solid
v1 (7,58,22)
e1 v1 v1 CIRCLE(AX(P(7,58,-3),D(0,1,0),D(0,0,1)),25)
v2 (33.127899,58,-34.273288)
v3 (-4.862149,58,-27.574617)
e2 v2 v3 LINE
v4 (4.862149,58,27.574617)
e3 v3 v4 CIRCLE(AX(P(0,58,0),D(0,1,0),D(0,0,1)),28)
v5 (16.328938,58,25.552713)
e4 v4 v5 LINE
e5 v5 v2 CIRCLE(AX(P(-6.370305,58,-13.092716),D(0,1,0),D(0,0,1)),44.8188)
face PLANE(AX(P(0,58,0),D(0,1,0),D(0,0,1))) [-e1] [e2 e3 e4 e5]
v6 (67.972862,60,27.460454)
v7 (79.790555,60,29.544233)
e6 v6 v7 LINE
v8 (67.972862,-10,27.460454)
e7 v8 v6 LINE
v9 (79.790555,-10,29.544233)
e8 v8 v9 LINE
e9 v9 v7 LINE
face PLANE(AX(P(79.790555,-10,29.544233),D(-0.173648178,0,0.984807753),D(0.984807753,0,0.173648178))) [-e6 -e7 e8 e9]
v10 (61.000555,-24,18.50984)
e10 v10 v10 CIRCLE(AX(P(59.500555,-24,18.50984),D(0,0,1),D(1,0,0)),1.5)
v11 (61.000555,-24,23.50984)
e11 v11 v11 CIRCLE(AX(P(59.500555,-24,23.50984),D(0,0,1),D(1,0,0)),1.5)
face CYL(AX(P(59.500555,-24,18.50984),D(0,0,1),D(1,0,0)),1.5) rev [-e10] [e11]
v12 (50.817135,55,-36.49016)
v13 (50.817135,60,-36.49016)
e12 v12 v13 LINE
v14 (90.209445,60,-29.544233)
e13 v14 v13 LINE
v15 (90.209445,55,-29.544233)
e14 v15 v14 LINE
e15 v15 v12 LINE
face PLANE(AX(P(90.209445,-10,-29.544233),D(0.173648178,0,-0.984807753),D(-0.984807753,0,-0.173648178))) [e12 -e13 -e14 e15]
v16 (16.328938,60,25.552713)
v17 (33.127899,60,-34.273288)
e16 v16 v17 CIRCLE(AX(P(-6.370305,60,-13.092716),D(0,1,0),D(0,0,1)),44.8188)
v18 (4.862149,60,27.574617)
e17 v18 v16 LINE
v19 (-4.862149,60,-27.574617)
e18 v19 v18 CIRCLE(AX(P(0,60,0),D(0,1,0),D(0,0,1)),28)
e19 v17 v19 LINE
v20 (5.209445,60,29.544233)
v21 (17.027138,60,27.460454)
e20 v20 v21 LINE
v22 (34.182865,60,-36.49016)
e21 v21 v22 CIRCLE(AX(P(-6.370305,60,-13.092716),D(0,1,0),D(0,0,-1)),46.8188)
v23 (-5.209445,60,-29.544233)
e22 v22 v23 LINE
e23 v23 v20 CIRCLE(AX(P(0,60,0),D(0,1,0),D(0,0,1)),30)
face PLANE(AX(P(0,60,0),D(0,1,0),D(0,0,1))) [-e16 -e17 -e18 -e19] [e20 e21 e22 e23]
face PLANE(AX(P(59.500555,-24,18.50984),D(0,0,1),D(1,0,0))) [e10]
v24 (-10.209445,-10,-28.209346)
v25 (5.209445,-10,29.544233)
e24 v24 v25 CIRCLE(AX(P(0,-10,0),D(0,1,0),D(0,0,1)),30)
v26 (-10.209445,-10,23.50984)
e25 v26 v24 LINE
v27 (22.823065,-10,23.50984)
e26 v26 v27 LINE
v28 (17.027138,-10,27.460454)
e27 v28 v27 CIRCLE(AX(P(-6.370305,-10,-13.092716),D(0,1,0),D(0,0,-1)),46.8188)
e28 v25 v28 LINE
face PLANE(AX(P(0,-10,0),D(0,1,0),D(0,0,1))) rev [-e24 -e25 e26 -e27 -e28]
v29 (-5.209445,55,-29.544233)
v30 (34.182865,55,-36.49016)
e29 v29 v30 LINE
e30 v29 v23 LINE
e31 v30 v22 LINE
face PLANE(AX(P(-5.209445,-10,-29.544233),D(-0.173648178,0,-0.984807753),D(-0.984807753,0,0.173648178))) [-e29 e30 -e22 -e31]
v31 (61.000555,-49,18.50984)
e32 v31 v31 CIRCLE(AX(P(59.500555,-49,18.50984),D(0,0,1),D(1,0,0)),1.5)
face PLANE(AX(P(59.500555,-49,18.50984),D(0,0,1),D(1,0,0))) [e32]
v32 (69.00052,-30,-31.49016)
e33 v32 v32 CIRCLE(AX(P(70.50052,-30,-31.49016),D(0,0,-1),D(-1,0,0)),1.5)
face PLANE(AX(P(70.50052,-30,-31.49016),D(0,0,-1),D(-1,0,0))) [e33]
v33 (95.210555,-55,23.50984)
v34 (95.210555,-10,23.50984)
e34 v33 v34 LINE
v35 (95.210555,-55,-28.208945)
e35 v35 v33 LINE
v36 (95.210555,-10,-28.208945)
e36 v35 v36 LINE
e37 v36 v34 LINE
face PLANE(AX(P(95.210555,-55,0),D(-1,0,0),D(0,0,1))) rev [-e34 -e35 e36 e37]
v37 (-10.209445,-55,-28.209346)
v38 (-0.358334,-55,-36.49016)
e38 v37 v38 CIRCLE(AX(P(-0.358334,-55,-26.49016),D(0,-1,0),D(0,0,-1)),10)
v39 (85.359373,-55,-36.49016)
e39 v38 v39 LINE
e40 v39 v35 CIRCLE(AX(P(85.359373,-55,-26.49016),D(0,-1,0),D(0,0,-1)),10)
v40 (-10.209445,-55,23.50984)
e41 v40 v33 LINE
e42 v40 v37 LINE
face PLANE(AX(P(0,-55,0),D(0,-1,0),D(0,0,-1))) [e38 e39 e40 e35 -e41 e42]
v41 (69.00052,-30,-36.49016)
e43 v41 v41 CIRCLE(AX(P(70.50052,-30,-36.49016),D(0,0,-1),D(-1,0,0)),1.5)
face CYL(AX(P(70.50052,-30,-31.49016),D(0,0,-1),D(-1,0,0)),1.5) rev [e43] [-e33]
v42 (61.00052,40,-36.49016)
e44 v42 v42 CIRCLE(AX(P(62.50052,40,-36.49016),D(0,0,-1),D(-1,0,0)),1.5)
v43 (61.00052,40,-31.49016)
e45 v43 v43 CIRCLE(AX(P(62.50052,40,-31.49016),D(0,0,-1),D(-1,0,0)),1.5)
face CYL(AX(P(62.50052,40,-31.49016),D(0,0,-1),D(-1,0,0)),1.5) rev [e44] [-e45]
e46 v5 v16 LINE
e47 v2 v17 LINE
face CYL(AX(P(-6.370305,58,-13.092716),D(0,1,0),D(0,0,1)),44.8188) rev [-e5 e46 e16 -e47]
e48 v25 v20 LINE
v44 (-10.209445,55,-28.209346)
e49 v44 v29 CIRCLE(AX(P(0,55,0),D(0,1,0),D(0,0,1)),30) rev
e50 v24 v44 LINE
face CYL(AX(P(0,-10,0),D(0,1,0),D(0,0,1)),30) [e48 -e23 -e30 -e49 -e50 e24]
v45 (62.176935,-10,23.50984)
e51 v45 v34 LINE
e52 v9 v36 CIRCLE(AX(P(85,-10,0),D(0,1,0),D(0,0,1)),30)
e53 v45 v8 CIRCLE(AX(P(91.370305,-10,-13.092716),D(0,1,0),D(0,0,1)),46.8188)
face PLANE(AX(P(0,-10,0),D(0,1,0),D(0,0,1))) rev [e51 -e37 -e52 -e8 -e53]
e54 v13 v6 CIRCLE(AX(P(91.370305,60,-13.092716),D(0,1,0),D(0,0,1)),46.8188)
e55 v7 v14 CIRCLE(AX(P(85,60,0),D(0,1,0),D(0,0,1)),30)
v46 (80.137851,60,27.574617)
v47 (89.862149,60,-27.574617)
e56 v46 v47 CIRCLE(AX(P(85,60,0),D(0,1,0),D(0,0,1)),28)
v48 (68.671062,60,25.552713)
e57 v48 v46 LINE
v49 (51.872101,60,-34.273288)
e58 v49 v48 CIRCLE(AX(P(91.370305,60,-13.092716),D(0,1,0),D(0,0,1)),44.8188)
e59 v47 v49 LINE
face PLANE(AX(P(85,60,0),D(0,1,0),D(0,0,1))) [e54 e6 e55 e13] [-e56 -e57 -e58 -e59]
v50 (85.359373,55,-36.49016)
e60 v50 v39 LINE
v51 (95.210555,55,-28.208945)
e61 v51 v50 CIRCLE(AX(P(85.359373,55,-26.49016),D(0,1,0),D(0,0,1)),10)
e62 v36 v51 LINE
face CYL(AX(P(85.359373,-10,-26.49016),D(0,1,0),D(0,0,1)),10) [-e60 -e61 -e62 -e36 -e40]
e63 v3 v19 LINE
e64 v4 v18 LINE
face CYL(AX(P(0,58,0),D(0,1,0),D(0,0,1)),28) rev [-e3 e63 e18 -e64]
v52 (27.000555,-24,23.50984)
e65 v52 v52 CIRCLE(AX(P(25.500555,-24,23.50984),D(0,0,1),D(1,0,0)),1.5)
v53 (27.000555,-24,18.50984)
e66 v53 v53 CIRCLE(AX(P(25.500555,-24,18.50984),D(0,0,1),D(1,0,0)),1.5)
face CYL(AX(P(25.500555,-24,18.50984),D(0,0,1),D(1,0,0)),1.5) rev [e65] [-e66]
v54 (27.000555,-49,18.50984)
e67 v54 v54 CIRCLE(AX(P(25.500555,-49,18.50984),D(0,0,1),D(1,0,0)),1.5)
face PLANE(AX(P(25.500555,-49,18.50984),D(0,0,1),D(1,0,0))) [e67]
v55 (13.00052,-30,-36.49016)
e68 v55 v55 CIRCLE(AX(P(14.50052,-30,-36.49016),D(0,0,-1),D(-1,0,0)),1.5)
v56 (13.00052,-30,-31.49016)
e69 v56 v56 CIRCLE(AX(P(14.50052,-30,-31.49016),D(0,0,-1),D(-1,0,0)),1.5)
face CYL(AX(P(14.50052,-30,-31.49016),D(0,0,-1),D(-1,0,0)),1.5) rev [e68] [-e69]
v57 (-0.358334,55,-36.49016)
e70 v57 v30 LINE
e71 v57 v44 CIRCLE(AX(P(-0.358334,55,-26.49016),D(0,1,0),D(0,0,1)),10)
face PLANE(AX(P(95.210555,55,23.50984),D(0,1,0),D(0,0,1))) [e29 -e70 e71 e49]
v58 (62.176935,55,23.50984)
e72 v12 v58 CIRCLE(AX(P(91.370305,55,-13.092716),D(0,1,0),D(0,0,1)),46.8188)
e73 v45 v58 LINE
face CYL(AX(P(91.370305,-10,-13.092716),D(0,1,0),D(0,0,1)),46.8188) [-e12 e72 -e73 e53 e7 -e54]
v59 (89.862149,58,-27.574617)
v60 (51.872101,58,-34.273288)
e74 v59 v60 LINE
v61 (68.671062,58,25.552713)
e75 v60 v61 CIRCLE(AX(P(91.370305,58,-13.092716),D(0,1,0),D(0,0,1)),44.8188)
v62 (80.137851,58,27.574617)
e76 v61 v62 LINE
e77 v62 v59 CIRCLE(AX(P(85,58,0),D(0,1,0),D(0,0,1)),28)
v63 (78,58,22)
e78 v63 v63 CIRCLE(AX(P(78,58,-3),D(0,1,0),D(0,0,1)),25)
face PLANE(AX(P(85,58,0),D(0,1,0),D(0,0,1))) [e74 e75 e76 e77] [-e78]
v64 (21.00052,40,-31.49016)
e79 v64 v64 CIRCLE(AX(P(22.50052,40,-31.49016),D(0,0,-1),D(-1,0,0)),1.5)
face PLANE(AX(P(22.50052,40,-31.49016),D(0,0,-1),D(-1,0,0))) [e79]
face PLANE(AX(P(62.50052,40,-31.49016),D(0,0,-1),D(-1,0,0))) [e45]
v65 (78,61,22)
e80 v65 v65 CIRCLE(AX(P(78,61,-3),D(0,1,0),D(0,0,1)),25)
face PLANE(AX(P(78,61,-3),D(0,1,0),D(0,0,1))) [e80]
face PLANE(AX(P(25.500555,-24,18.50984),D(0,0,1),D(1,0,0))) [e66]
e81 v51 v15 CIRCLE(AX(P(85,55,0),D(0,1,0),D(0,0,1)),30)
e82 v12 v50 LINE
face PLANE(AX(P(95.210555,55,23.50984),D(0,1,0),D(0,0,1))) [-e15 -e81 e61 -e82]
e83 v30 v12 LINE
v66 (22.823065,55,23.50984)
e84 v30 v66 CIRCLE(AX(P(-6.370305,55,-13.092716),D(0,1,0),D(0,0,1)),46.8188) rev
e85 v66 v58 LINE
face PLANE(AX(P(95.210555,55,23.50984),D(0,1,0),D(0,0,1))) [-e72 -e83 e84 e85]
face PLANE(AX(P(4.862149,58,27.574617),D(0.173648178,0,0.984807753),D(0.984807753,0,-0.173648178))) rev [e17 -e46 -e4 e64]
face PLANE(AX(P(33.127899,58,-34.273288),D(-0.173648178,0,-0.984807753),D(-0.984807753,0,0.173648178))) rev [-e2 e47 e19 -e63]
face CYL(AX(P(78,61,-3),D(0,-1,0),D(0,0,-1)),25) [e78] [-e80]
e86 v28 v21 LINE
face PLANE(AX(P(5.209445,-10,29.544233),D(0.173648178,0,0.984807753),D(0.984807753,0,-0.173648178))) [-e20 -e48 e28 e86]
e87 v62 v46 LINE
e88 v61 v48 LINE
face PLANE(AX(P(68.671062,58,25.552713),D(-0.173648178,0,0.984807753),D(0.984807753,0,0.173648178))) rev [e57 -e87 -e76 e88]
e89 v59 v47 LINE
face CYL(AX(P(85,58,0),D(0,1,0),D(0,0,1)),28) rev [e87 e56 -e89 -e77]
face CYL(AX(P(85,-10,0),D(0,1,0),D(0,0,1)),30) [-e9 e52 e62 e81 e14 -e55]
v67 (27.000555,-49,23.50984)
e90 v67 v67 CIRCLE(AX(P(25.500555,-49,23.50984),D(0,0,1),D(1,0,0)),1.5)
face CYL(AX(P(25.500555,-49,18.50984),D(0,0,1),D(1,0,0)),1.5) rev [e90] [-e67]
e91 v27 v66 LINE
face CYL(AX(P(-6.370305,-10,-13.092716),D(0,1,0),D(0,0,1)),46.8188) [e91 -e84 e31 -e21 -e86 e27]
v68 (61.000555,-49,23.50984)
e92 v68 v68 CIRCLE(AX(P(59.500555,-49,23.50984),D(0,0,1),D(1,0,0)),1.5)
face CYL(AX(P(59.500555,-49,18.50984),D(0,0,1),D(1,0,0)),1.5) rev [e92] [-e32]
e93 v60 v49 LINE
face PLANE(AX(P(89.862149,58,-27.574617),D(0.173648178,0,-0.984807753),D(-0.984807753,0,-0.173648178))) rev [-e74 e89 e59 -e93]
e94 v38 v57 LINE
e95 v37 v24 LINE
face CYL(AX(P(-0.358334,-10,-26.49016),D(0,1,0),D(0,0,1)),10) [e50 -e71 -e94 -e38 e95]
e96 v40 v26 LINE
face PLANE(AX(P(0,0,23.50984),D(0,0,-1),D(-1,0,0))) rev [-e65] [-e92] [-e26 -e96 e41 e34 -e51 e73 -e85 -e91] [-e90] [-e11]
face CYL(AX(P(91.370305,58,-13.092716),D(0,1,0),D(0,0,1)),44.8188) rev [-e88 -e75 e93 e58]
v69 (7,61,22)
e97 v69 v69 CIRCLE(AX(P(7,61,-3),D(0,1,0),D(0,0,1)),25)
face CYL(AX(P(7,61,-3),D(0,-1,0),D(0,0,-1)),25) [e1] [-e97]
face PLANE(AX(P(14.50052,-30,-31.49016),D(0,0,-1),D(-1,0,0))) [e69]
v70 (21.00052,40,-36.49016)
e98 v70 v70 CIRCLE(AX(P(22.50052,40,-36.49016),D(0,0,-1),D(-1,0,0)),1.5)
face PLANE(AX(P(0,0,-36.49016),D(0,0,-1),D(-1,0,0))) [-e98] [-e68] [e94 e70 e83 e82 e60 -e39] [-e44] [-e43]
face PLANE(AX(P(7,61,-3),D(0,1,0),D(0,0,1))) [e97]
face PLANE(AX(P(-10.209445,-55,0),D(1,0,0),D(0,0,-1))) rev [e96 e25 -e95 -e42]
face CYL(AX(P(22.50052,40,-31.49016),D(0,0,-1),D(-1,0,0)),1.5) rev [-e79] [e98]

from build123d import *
from build123d.topology import SkipClean

# Parameters (mm, degrees)
SALIENTE_EXTRUIR1_DEPTH        = 60
SALIENTE_EXTRUIR1_DEPTH_BACK   = 10
SALIENTE_EXTRUIR1_2_DEPTH      = 60
SALIENTE_EXTRUIR1_2_DEPTH_BACK = 10
CROQUIS5_W                     = 105.42
CROQUIS5_H                     = 65
SALIENTE_EXTRUIR4_DEPTH        = 60
REDONDEO1_R                    = 10
CORTAR_EXTRUIR3_DEPTH          = 2
CROQUIS8_R                     = 25
SALIENTE_EXTRUIR5_DEPTH        = 3
SALIENTE_EXTRUIR6_DEPTH        = 45
CROQUIS10_R                    = 1.5
CORTAR_EXTRUIR4_DEPTH          = 5
CROQUIS11_R                    = 1.5
CORTAR_EXTRUIR5_DEPTH          = 5


with BuildPart() as part:
    # Croquis1 → Saliente-Extruir1 (new, two sides: drawn at the far end of the back side and taken through both)
    with BuildSketch(Plane(origin=(0, 0, 0), x_dir=(1, 0, 0), z_dir=(0, 1, 0)).offset(-SALIENTE_EXTRUIR1_DEPTH_BACK)):
        with BuildLine():
            Line((-5.20944533, 29.54423259), (34.18286479, 36.490159697))
            ThreePointArc((34.18286479, 36.490159697), (38.849607431, 0.961785341), (17.027138366, -27.460454458))
            Line((17.027138366, -27.460454458), (5.20944533, -29.54423259))
            ThreePointArc((5.20944533, -29.54423259), (-29.54423259, -5.20944533), (-5.20944533, 29.54423259))
        make_face()
    extrude(amount=SALIENTE_EXTRUIR1_DEPTH + SALIENTE_EXTRUIR1_DEPTH_BACK)



with BuildPart() as body_2:
    # Croquis1 → Saliente-Extruir1 2 (new, two sides: drawn at the far end of the back side and taken through both)
    with BuildSketch(Plane(origin=(0, 0, 0), x_dir=(1, 0, 0), z_dir=(0, 1, 0)).offset(-SALIENTE_EXTRUIR1_2_DEPTH_BACK)):
        with BuildLine():
            Line((90.20944533, 29.54423259), (50.81713521, 36.490159697))
            ThreePointArc((50.81713521, 36.490159697), (46.150392569, 0.961785341), (67.972861634, -27.460454458))
            Line((67.972861634, -27.460454458), (79.79055467, -29.54423259))
            ThreePointArc((79.79055467, -29.54423259), (114.54423259, -5.20944533), (90.20944533, 29.54423259))
        make_face()
    extrude(amount=SALIENTE_EXTRUIR1_2_DEPTH + SALIENTE_EXTRUIR1_2_DEPTH_BACK)


with BuildPart() as part_1:
    add(part.part)

    add(body_2.part)  # Saliente-Extruir4 merges body 2
    # Croquis5 → Saliente-Extruir4 (add)
    with BuildSketch(Plane(origin=(0, 0, -36.490159697), x_dir=(-1, 0, 0), z_dir=(0, 0, -1))):
        with Locations((-42.50055467, 22.5)):
            Rectangle(CROQUIS5_W, CROQUIS5_H)
    extrude(amount=-SALIENTE_EXTRUIR4_DEPTH)

    # Redondeo1
    # the kernel refuses this fillet: 10 mm, written as the material it takes off along each edge
    with BuildSketch(Plane(origin=(-10.20944533, 79.627778647, -36.490159697), x_dir=(1, 0, 0), z_dir=(0, -1, 0))) as redondeo1_piece_1:
        with BuildLine():
            CenterArc((9.851111459, 10), REDONDEO1_R, 189.899393553, 80.100606447)
            Line((0, 8.280813266), (-0.197022229, 8.246429532))
            ThreePointArc((-0.197022229, 8.246429532), (-0.2, 4.140406633), (-0.2, 0))
            Line((-0.2, 0), (0, -0.2))
            Line((0, -0.2), (9.851111459, -0.2))
            Line((9.851111459, -0.2), (9.851111459, 0))
        make_face()
    extrude(amount=114.255557294, mode=Mode.SUBTRACT)
    with BuildSketch(Plane(origin=(95.21055467, -34.627953804, -36.490159697), x_dir=(-1, 0, 0), z_dir=(0, 1, 0))) as redondeo1_piece_2:
        with BuildLine():
            CenterArc((9.851181521, 10), REDONDEO1_R, 189.897058287, 80.102941713)
            Line((0, 8.28121478), (-0.19702363, 8.246839076))
            ThreePointArc((-0.19702363, 8.246839076), (-0.2, 4.14060739), (-0.2, 0))
            Line((-0.2, 0), (0, -0.2))
            Line((0, -0.2), (9.851181521, -0.2))
            Line((9.851181521, -0.2), (9.851181521, 0))
        make_face()
    extrude(amount=114.255907607, mode=Mode.SUBTRACT)

    # Croquis7 → Cortar-Extruir3 (cut)
    with BuildSketch(Plane(origin=(0, 60, 0), x_dir=(1, 0, 0), z_dir=(0, 1, 0))):
        with BuildLine():
            Line((4.862148975, -27.574617084), (16.328937751, -25.552712841))
            ThreePointArc((16.328937751, -25.552712841), (36.779644877, 0.976339149), (33.127899287, 34.273287591))
            Line((33.127899287, 34.273287591), (-4.862148975, 27.574617084))
            ThreePointArc((-4.862148975, 27.574617084), (-27.574617084, -4.862148975), (4.862148975, -27.574617084))
        make_face()
        with BuildLine():
            Line((89.862148975, 27.574617084), (51.872100713, 34.273287591))
            ThreePointArc((51.872100713, 34.273287591), (48.220355123, 0.976339149), (68.671062249, -25.552712841))
            Line((68.671062249, -25.552712841), (80.137851025, -27.574617084))
            ThreePointArc((80.137851025, -27.574617084), (112.574617084, -4.862148975), (89.862148975, 27.574617084))
        make_face()
    extrude(amount=-CORTAR_EXTRUIR3_DEPTH, mode=Mode.SUBTRACT)

    # Croquis8 → Saliente-Extruir5 (add)
    with BuildSketch(Plane(origin=(0, 58, 0), x_dir=(1, 0, 0), z_dir=(0, 1, 0))):
        with Locations(Location((7, 3, 0), (0, 0, 270))):
            Circle(CROQUIS8_R)
        with Locations(Location((78, 3, 0), (0, 0, 270))):
            Circle(CROQUIS8_R)
    extrude(amount=SALIENTE_EXTRUIR5_DEPTH)

    # Croquis9 → Saliente-Extruir6 (add)
    with SkipClean():  # the faces are left unmerged after this step: merging them gives an invalid solid
        with BuildSketch(Plane.XZ.offset(10)):
            with BuildLine():
                ThreePointArc((85.359373149, -36.490159697), (91.794128303, -34.144826646), (95.21055467, -28.208944917))
                Line((95.21055467, -28.208944917), (95.21055467, 23.509840303))
                Line((95.21055467, 23.509840303), (62.176934943, 23.509840303))
                Line((62.176934943, 23.509840303), (22.823065057, 23.509840303))
                Line((22.823065057, 23.509840303), (-10.20944533, 23.509840303))
                Line((-10.20944533, 23.509840303), (-10.20944533, -28.209346431))
                ThreePointArc((-10.20944533, -28.209346431), (-6.79293303, -34.144957779), (-0.358333871, -36.490159697))
                Line((-0.358333871, -36.490159697), (85.359373149, -36.490159697))
            make_face()
        extrude(amount=SALIENTE_EXTRUIR6_DEPTH)

    # Croquis10 → Cortar-Extruir4 (cut)
    with SkipClean():  # the faces are left unmerged after this step: merging them gives an invalid solid
        with BuildSketch(Plane.XY.offset(23.509840303)):
            with Locations((59.50055467, -24)):
                Circle(CROQUIS10_R)
            with Locations((59.50055467, -49)):
                Circle(CROQUIS10_R)
            with Locations((25.50055467, -24)):
                Circle(CROQUIS10_R)
            with Locations((25.50055467, -49)):
                Circle(CROQUIS10_R)
        extrude(amount=-CORTAR_EXTRUIR4_DEPTH, mode=Mode.SUBTRACT)

    # Croquis11 → Cortar-Extruir5 (cut)
    with SkipClean():  # the faces are left unmerged after this step: merging them gives an invalid solid
        with BuildSketch(Plane(origin=(0, 0, -36.490159697), x_dir=(-1, 0, 0), z_dir=(0, 0, -1))):
            with Locations((-62.500519639, 40)):
                Circle(CROQUIS11_R)
            with Locations((-22.500519639, 40)):
                Circle(CROQUIS11_R)
            with Locations((-14.500519639, -30)):
                Circle(CROQUIS11_R)
            with Locations((-70.500519639, -30)):
                Circle(CROQUIS11_R)
        extrude(amount=-CORTAR_EXTRUIR5_DEPTH, mode=Mode.SUBTRACT)


solid = part_1.part
